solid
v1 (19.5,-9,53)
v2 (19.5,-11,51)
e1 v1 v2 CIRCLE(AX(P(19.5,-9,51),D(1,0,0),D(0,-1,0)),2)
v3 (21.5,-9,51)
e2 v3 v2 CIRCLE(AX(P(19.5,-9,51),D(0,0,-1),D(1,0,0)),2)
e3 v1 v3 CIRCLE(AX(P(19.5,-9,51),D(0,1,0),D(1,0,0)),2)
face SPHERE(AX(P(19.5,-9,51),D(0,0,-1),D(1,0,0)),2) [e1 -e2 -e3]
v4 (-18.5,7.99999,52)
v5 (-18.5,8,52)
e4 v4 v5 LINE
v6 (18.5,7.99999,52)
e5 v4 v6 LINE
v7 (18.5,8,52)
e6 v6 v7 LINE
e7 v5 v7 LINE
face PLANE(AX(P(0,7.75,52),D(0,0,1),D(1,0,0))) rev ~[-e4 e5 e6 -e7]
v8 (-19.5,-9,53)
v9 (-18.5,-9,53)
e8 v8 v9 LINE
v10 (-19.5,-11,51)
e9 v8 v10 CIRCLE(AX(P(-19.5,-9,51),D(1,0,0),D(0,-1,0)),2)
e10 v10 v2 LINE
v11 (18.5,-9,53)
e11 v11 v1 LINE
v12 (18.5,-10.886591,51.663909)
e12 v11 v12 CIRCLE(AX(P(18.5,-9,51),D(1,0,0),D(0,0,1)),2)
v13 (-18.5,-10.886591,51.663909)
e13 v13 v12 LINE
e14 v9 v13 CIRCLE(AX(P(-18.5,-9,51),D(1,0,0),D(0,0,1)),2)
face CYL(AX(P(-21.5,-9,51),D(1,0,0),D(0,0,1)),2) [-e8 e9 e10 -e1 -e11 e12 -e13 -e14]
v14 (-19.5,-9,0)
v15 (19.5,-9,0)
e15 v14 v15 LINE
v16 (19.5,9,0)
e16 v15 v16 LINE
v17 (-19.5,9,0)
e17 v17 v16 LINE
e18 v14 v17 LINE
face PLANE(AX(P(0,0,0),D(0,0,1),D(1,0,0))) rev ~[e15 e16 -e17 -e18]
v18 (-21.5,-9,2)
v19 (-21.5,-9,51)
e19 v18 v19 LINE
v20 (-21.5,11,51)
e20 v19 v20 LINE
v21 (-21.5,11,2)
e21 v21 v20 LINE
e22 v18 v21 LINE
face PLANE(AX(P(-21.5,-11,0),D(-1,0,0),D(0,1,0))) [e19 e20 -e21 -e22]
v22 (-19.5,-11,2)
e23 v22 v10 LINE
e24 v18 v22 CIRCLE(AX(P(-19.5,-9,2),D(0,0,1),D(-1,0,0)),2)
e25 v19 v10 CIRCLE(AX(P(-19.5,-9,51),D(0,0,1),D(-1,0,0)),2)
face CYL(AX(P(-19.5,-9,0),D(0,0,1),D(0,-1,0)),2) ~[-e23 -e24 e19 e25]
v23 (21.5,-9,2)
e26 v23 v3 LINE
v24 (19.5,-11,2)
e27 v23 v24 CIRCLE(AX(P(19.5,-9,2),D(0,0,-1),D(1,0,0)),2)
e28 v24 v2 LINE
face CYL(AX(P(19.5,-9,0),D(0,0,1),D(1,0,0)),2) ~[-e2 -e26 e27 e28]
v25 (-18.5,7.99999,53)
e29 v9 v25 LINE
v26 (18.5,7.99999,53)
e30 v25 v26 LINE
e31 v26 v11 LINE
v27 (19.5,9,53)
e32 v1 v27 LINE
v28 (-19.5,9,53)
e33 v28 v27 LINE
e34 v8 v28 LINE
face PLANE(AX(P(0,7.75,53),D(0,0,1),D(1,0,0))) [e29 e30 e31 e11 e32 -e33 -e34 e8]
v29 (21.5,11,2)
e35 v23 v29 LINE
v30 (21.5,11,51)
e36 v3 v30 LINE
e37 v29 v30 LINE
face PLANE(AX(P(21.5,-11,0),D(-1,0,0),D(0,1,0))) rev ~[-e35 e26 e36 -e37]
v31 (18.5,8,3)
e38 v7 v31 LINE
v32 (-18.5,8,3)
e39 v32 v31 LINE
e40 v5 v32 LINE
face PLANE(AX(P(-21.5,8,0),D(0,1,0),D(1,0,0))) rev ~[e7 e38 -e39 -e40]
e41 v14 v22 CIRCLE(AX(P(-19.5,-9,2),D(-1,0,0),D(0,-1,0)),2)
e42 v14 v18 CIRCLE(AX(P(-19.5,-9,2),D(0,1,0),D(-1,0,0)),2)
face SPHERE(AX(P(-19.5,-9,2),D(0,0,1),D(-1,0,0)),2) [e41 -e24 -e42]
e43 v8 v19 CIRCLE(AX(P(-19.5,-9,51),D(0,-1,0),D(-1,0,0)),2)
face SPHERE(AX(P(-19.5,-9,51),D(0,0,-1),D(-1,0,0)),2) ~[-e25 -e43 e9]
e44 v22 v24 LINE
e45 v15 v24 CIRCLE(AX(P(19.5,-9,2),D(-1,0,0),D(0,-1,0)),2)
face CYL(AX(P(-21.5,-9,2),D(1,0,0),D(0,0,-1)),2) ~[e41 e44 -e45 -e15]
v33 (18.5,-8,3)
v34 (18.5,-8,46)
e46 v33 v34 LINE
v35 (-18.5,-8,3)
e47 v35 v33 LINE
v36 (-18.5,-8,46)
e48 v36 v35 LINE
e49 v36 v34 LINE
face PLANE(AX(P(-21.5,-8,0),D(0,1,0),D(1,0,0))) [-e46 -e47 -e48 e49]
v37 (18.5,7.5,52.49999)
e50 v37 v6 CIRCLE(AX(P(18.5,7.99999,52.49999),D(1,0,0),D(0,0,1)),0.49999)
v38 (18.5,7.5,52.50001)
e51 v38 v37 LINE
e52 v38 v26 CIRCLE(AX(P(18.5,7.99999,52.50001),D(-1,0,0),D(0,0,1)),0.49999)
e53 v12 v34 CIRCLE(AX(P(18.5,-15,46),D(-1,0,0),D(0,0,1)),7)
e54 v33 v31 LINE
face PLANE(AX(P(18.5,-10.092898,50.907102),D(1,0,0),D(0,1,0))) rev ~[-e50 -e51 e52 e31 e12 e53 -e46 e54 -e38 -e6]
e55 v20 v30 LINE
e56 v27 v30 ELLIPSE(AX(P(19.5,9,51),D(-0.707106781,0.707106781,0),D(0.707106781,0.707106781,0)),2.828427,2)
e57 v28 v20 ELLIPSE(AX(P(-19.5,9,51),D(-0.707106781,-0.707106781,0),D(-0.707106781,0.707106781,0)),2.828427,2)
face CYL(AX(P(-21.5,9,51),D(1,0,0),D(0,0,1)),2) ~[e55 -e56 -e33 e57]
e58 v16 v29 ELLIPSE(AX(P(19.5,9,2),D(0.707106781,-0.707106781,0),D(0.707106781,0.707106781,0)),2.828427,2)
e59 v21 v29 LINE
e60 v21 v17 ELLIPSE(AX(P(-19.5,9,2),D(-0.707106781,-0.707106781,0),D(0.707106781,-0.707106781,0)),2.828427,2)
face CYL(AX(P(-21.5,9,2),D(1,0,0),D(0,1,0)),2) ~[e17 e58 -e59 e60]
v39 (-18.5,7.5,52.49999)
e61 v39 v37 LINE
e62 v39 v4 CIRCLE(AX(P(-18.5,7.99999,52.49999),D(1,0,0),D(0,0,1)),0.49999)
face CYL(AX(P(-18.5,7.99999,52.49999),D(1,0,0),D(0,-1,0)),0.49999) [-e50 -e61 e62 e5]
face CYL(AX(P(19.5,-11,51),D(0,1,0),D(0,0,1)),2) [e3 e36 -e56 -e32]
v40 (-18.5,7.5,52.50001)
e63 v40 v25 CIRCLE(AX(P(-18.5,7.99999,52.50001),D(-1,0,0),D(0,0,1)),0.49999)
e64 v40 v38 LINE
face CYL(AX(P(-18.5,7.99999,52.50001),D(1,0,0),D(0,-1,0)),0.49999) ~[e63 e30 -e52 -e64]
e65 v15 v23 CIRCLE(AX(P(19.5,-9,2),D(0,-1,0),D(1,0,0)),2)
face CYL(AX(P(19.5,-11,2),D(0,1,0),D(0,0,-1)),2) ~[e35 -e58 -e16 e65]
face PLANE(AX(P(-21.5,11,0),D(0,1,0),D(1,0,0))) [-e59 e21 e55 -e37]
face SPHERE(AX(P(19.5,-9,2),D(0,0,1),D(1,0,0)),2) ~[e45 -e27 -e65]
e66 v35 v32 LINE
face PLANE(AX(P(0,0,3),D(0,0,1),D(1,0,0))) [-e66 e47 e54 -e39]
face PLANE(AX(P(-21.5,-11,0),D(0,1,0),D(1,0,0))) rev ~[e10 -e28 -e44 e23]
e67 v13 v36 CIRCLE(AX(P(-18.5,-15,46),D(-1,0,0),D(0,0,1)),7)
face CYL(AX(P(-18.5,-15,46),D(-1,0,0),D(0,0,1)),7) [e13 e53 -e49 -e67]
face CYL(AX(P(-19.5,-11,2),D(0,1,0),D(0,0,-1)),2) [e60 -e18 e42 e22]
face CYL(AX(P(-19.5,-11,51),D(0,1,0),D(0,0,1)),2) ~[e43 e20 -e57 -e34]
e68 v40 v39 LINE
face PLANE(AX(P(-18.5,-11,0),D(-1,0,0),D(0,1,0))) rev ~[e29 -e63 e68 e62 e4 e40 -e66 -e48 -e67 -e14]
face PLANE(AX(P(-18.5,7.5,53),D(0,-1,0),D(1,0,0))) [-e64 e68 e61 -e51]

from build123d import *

# Parameters (mm, degrees)
F0_W        = 43
F0_H        = 22
F1_DEPTH    = 53
F2_T        = -3
F3_W        = 37
F3_H        = 0.5
F4_DEPTH    = 1
F5_R        = 0.49999
F6_R        = 2
F7_T1_DEPTH = 37


# Not quite as in the source:
# - a fillet or chamfer that OpenCascade refuses, or shapes differently, is made with other operations: its cross-section is extruded or revolved along the edge and cut away or added
# - a fillet or chamfer is up to 0.001 mm smaller than in the source, because OpenCascade refuses the exact size


with BuildPart() as f1:
    # F0 (on Top) → F1 (new body)
    with BuildSketch(Plane.XY):
        Rectangle(F0_W, F0_H)
    extrude(amount=F1_DEPTH)

    # F2
    f2_openings = [f1.faces().sort_by_distance(p)[0] for p in [
        (0, 0, 53),
    ]]
    offset(amount=F2_T, openings=f2_openings)

    # F3 (on face) → F4 (join)
    with BuildSketch(Plane.XY.offset(53)):
        with Locations((0, 7.75)):
            Rectangle(F3_W, F3_H)
    extrude(amount=-F4_DEPTH)

    # F5 (radius 0.5 in the source; OpenCascade refuses exactly that, so slightly less here)
    f5_edges = [f1.edges().sort_by_distance(p)[0] for p in [
        (0, 7.5, 53),
        (0, 7.5, 52),
    ]]
    fillet(f5_edges, radius=F5_R)

    # F6
    f6_edges = [f1.edges().sort_by_distance(p)[0] for p in [
        (21.5, -11, 26.5),
        (-21.5, -11, 26.5),
        (21.5, 0, 0),
        (0, 11, 0),
        (-21.5, 0, 0),
        (0, -11, 0),
        (-21.5, 0, 53),
        (0, 11, 53),
        (21.5, 0, 53),
        (0, -11, 53),
    ]]
    fillet(f6_edges, radius=F6_R)

    # F7: fillet of radius 7 on 1 edges, made by hand

    # F7_s2 → F7_t1 (cut)
    with BuildSketch(Plane.YZ.offset(-18.5)):
        with BuildLine():
            ThreePointArc((-15, 53), (-10.0502525317, 50.9497474683), (-8, 46))
            Line((-8, 46), (-7.86, 46))
            Line((-7.86, 46), (-7.86, 53.14))
            Line((-7.86, 53.14), (-15, 53.14))
            Line((-15, 53.14), (-15, 53))
        make_face()
    extrude(amount=F7_T1_DEPTH, mode=Mode.SUBTRACT)


solid = f1.part
